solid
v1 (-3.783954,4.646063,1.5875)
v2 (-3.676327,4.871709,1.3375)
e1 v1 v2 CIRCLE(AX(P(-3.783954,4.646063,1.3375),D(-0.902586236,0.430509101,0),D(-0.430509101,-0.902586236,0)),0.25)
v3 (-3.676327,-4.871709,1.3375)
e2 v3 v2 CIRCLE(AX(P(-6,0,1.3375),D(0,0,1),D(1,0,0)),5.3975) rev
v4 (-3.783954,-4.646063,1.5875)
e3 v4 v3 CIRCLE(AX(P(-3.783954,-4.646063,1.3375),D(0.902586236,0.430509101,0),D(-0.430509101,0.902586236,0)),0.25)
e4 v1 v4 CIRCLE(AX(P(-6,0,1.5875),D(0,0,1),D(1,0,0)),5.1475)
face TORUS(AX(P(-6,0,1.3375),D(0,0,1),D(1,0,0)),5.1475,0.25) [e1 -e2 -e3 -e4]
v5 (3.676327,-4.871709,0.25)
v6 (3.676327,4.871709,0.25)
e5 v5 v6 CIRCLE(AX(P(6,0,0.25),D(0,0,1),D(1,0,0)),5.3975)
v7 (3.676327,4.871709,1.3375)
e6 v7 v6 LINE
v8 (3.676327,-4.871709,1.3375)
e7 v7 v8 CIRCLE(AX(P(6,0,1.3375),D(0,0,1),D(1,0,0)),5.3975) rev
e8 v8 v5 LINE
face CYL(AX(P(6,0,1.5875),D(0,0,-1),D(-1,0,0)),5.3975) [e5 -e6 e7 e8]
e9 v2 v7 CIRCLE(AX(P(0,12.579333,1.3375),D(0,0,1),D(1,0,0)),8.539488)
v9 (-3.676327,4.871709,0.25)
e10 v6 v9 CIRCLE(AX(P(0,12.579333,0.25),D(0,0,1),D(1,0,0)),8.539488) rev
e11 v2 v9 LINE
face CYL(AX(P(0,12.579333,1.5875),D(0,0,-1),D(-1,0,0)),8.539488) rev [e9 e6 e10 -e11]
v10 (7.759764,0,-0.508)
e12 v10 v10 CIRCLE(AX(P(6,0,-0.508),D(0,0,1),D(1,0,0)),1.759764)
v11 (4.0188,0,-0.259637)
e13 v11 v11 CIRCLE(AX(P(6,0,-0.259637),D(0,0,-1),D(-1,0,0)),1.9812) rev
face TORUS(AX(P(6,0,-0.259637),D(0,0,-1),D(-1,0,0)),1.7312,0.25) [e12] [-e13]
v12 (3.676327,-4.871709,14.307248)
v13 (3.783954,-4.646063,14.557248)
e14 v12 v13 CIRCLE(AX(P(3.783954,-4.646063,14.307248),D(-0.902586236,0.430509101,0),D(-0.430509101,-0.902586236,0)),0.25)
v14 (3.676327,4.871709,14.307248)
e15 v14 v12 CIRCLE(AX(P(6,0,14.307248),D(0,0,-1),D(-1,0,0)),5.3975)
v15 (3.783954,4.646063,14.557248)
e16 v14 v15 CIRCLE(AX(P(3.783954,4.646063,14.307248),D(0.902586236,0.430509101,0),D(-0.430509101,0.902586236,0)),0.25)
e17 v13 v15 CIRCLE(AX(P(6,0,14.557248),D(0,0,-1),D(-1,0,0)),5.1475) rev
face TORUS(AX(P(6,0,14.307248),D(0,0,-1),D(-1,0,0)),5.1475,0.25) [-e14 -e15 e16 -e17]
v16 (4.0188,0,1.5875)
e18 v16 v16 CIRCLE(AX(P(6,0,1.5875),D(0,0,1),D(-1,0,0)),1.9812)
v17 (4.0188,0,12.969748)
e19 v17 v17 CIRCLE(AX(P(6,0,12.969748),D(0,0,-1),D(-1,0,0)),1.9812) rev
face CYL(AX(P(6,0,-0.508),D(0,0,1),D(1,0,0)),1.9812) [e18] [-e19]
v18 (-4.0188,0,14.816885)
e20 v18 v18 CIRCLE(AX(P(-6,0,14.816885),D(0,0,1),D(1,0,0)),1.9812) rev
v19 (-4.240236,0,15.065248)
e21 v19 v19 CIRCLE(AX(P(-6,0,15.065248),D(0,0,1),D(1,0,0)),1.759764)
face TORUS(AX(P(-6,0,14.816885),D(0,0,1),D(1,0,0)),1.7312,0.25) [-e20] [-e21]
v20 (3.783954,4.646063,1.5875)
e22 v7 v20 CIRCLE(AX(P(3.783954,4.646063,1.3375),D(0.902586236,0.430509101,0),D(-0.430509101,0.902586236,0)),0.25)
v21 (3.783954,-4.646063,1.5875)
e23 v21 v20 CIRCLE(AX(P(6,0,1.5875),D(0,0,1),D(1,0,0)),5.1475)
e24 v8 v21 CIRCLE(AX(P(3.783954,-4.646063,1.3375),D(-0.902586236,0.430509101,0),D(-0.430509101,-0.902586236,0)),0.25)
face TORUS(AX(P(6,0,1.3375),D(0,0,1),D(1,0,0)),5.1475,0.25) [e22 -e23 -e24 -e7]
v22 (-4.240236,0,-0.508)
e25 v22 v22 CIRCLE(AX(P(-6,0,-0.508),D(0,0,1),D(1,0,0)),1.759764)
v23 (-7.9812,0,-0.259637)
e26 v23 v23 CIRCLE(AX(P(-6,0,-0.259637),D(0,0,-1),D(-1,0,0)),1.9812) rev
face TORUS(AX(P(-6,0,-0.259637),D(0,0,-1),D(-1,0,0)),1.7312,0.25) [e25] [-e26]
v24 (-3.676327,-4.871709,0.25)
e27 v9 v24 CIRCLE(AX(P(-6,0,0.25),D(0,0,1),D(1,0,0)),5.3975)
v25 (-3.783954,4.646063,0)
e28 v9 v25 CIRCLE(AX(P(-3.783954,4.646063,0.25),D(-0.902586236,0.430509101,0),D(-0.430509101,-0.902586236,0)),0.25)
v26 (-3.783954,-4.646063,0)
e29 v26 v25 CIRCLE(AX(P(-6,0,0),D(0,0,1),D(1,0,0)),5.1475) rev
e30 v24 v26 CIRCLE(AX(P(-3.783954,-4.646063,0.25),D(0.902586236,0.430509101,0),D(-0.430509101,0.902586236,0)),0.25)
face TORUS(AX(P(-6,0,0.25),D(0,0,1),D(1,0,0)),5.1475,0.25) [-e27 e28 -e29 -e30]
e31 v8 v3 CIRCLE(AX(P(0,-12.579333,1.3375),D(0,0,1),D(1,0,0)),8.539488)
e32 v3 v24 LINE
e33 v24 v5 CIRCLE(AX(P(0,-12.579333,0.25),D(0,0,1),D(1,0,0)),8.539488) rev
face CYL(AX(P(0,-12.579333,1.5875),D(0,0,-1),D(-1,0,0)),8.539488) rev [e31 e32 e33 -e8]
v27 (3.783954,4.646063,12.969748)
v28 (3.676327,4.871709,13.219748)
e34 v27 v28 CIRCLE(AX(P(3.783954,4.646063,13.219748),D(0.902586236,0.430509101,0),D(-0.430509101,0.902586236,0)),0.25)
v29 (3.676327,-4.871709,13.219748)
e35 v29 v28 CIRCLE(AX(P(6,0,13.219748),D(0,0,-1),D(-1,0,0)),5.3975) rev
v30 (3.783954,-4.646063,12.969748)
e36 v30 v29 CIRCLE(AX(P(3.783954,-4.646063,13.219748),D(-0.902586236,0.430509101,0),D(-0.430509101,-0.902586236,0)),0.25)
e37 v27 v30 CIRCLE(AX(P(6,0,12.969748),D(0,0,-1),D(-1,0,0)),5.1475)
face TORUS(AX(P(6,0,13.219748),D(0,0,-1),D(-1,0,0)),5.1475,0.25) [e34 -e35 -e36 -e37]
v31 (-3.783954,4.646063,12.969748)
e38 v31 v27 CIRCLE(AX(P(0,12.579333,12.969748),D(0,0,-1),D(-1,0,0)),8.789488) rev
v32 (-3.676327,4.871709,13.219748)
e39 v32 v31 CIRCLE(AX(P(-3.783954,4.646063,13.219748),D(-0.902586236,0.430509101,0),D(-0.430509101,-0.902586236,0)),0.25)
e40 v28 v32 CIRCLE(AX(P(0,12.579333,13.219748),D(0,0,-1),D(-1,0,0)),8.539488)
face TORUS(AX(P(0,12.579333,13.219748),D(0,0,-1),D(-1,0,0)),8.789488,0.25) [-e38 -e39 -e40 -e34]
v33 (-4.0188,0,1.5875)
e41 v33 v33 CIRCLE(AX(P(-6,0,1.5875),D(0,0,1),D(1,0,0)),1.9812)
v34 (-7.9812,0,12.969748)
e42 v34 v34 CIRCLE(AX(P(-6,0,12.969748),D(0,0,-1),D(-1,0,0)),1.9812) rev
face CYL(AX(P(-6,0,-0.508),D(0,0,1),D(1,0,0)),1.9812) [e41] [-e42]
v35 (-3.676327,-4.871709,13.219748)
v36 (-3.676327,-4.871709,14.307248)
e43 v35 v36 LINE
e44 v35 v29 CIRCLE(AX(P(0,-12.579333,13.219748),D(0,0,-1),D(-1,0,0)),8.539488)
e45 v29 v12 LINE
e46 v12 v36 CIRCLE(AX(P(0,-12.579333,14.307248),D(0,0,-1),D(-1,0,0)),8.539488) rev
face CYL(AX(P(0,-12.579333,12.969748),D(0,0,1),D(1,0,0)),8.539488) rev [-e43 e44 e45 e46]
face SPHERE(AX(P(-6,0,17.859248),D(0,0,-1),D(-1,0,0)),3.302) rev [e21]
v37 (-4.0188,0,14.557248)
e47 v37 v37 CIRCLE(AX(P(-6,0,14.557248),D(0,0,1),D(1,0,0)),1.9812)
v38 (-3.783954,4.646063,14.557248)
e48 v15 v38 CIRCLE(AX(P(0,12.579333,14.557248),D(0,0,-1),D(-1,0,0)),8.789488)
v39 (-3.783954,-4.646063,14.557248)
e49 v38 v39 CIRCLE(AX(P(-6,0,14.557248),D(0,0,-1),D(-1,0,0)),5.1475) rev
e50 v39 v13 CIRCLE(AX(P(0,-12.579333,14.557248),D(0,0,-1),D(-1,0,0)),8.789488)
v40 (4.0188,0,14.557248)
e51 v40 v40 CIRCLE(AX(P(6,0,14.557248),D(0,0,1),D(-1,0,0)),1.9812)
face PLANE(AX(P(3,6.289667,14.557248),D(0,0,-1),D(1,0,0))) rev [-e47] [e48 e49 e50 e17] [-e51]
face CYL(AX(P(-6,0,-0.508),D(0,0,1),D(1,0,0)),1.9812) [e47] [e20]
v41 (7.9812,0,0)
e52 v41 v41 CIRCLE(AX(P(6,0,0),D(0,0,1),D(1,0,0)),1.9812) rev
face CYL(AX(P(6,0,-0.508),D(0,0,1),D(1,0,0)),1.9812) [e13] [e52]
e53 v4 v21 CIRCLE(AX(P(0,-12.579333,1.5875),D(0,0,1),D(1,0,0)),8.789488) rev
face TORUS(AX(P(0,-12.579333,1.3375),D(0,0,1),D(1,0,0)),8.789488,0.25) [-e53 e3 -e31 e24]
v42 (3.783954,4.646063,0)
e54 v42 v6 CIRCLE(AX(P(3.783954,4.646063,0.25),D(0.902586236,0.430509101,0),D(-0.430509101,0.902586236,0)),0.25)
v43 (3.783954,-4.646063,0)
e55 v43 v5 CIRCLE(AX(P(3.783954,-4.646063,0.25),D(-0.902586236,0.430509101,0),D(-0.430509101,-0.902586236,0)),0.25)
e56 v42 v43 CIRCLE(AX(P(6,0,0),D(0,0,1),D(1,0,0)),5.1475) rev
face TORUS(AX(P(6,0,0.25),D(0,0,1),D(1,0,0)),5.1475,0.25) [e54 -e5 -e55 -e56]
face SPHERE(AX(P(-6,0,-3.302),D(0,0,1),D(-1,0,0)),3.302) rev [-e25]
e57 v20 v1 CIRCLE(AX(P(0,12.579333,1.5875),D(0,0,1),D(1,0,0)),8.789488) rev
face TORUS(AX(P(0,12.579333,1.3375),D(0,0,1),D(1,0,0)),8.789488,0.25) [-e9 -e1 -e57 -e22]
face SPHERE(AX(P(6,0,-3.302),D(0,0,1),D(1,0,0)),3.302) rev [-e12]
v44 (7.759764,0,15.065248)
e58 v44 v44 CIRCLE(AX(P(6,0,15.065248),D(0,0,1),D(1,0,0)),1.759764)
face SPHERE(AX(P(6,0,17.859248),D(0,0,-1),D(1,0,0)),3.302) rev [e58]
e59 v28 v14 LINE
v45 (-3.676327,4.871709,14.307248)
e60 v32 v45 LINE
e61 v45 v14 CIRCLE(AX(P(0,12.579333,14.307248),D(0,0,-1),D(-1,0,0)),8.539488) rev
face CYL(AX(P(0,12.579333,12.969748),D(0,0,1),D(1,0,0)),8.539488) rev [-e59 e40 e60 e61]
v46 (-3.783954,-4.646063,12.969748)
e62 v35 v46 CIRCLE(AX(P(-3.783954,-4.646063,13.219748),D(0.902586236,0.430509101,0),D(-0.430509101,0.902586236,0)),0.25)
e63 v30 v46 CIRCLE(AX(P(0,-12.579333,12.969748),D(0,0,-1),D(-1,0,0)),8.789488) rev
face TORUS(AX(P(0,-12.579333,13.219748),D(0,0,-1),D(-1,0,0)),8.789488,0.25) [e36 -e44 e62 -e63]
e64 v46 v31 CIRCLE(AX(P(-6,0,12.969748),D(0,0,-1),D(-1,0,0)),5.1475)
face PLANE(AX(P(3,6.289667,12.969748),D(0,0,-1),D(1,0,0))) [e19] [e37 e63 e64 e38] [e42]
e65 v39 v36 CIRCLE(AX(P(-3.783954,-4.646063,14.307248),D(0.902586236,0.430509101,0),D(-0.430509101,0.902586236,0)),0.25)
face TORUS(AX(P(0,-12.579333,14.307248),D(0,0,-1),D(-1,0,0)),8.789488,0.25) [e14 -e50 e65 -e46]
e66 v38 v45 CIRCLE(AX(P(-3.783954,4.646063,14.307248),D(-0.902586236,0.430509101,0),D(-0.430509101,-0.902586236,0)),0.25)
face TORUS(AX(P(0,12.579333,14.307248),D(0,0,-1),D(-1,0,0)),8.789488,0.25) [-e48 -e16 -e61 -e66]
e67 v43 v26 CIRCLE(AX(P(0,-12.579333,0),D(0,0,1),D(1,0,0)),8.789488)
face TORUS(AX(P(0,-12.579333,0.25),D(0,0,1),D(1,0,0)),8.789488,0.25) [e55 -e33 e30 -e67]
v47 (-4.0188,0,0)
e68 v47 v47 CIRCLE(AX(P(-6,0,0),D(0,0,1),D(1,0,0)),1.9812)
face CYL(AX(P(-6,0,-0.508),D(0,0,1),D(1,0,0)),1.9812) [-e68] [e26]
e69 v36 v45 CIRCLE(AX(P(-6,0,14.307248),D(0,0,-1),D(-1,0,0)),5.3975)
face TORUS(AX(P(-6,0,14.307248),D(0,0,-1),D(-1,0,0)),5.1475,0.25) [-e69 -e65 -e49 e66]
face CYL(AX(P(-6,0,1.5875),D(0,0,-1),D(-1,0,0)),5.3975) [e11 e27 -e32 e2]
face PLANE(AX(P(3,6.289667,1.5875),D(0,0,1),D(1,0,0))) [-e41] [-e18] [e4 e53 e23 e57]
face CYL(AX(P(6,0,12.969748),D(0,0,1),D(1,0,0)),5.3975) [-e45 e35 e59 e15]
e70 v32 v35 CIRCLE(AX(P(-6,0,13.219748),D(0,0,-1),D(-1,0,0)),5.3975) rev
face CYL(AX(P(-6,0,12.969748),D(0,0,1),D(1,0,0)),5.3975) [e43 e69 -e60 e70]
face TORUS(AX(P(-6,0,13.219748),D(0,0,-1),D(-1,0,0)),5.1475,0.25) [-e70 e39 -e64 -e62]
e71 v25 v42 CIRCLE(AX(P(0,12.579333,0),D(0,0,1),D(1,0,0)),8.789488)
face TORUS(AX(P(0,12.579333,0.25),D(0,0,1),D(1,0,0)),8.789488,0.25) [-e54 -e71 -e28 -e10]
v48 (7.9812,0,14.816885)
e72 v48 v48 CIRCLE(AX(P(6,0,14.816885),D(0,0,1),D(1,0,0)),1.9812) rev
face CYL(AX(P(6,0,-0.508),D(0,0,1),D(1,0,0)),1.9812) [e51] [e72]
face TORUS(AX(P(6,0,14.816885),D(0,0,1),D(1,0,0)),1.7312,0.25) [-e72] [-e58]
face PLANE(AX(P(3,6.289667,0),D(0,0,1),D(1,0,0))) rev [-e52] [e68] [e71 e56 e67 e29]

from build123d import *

# Parameters (mm, degrees)
ESBO_O1_R                = 1.9812
RESSALTO_EXTRUS_O1_DEPTH = 1.5875
RESSALTO_EXTRUS_O2_START = -0.508
ESBO_O2_R                = 1.9812
RESSALTO_EXTRUS_O2_DEPTH = 15.573248
FILETE1_R                = 0.25
FILETE2_R                = 0.25


with BuildPart() as part:
    # Esboço1 → Ressalto-extrusão1 (new body)
    with BuildSketch(Plane.XY):
        with BuildLine():
            ThreePointArc((-3.676327125, 4.871709209), (-11.3975, 0), (-3.676327125, -4.871709209))
            ThreePointArc((-3.676327125, -4.871709209), (0, -4.039845582), (3.676327125, -4.871709209))
            ThreePointArc((3.676327125, -4.871709209), (11.3975, 0), (3.676327125, 4.871709209))
            ThreePointArc((3.676327125, 4.871709209), (0, 4.039845582), (-3.676327125, 4.871709209))
        make_face()
        with Locations((-6, 0)):
            Circle(ESBO_O1_R, mode=Mode.SUBTRACT)
        with Locations(Location((6, 0, 0), (0, 0, 180))):
            Circle(ESBO_O1_R, mode=Mode.SUBTRACT)
    ressalto_extrus_o1 = extrude(amount=RESSALTO_EXTRUS_O1_DEPTH)

    # Esboço2 → Ressalto-extrusão2 (add)
    with BuildSketch(Plane.XY.offset(RESSALTO_EXTRUS_O2_START)):
        with Locations((-6, 0)):
            Circle(ESBO_O2_R)
    ressalto_extrus_o2 = extrude(amount=RESSALTO_EXTRUS_O2_DEPTH)

    # Espelhar1: Ressalto-extrusão1 across plane
    add(ressalto_extrus_o1.mirror(Plane.XY.offset(7.278624)))

    # Esboço3 → Corte-Revolução1 (revolve, cut)
    with BuildSketch(Plane(origin=(0, 0, 0), x_dir=(1, 0, 0), z_dir=(0, 1, 0))):
        with BuildLine():
            Line((-6, -14.557248), (-6, -15.319248))
            Line((-6, -15.319248), (-8.109882461, -15.319248))
            ThreePointArc((-8.109882461, -15.319248), (-7.12163363, -14.753585108), (-6, -14.557248))
        make_face()
    corte_revolu_o1 = revolve(axis=Axis((-6, 0, 14.557248), (0, 0, 1)), mode=Mode.SUBTRACT)

    # Espelhar2: Corte-Revolução1 across plane
    add(corte_revolu_o1.mirror(Plane.XY.offset(7.278624)), mode=Mode.SUBTRACT)

    # Espelhar3: Ressalto-extrusão2, Corte-Revolução1 across plane
    add(ressalto_extrus_o2.mirror(Plane(origin=(0, 0, 0), x_dir=(0, 0, 1), z_dir=(1, 0, 0))))
    add(corte_revolu_o1.mirror(Plane(origin=(0, 0, 0), x_dir=(0, 0, 1), z_dir=(1, 0, 0))), mode=Mode.SUBTRACT)

    # Espelhar3 copy 1 sketch → Espelhar3 copy 1 (revolve, cut)
    with BuildSketch(Plane(origin=(0, 0, 14.557248), x_dir=(-1, 0, 0), z_dir=(0, 1, 0))):
        with BuildLine():
            Line((-6, -14.557248), (-6, -15.319248))
            Line((-6, -15.319248), (-8.109882461, -15.319248))
            ThreePointArc((-8.109882461, -15.319248), (-7.12163363, -14.753585108), (-6, -14.557248))
        make_face()
    revolve(axis=Axis((6, 0, 0), (0, 0, -1)), mode=Mode.SUBTRACT)

    # Filete1
    filete1_edges = [part.edges().sort_by_distance(p)[0] for p in [
        (0, -4.039845582, 1.5875),
        (11.3975, 0, 1.5875),
        (0, 4.039845582, 12.969748),
        (11.3975, 0, 12.969748),
        (0, -4.039845582, 12.969748),
        (-11.3975, 0, 12.969748),
        (0, 4.039845582, 14.557248),
        (-11.3975, 0, 14.557248),
        (0, -4.039845582, 14.557248),
        (11.3975, 0, 14.557248),
        (0, 4.039845582, 1.5875),
        (11.3975, 0, 0),
        (0, -4.039845582, 0),
        (-11.3975, 0, 0),
        (0, 4.039845582, 0),
        (-11.3975, 0, 1.5875),
    ]]
    fillet(filete1_edges, radius=FILETE1_R)

    # Filete2
    # the kernel refuses this fillet: 0.25 mm, written as the material it takes off along each edge
    with BuildSketch(Plane(origin=(-6, 0, -0.508), x_dir=(1, 0, 0), z_dir=(0, -1, 0))) as filete2_piece_1:
        with BuildLine():
            CenterArc((1.7312, 0.248362879), FILETE2_R, 276.560626589, 83.439373411)
            Line((1.75976362, 0), (1.760334893, -0.004967258))
            ThreePointArc((1.760334893, -0.004967258), (1.87048181, -0.005), (1.9812, -0.005))
            Line((1.9812, -0.005), (1.9862, 0))
            Line((1.9862, 0), (1.9862, 0.248362879))
            Line((1.9862, 0.248362879), (1.9812, 0.248362879))
        make_face()
    revolve(axis=Axis((-6, 0, -0.508), (0, 0, 1)), mode=Mode.SUBTRACT)
    with BuildSketch(Plane(origin=(-6, 0, 15.065248), x_dir=(1, 0, 0), z_dir=(0, -1, 0))) as filete2_piece_2:
        with BuildLine():
            CenterArc((1.7312, -0.248362879), FILETE2_R, 0, 83.439373411)
            Line((1.75976362, 0), (1.760334893, 0.004967258))
            ThreePointArc((1.760334893, 0.004967258), (1.87048181, 0.005), (1.9812, 0.005))
            Line((1.9812, 0.005), (1.9862, 0))
            Line((1.9862, 0), (1.9862, -0.248362879))
            Line((1.9862, -0.248362879), (1.9812, -0.248362879))
        make_face()
    revolve(axis=Axis((-6, 0, 15.065248), (0, 0, 1)), mode=Mode.SUBTRACT)
    with BuildSketch(Plane(origin=(6, 0, 15.065248), x_dir=(-1, 0, 0), z_dir=(0, -1, 0))) as filete2_piece_3:
        with BuildLine():
            CenterArc((1.7312, 0.248362879), FILETE2_R, 276.560626589, 83.439373411)
            Line((1.75976362, 0), (1.760334893, -0.004967258))
            ThreePointArc((1.760334893, -0.004967258), (1.87048181, -0.005), (1.9812, -0.005))
            Line((1.9812, -0.005), (1.9862, 0))
            Line((1.9862, 0), (1.9862, 0.248362879))
            Line((1.9862, 0.248362879), (1.9812, 0.248362879))
        make_face()
    revolve(axis=Axis((6, 0, 15.065248), (0, 0, -1)), mode=Mode.SUBTRACT)
    with BuildSketch(Plane(origin=(6, 0, -0.508), x_dir=(-1, 0, 0), z_dir=(0, -1, 0))) as filete2_piece_4:
        with BuildLine():
            CenterArc((1.7312, -0.248362879), FILETE2_R, 0, 83.439373411)
            Line((1.75976362, 0), (1.760334893, 0.004967258))
            ThreePointArc((1.760334893, 0.004967258), (1.87048181, 0.005), (1.9812, 0.005))
            Line((1.9812, 0.005), (1.9862, 0))
            Line((1.9862, 0), (1.9862, -0.248362879))
            Line((1.9862, -0.248362879), (1.9812, -0.248362879))
        make_face()
    revolve(axis=Axis((6, 0, -0.508), (0, 0, -1)), mode=Mode.SUBTRACT)


solid = part.part
